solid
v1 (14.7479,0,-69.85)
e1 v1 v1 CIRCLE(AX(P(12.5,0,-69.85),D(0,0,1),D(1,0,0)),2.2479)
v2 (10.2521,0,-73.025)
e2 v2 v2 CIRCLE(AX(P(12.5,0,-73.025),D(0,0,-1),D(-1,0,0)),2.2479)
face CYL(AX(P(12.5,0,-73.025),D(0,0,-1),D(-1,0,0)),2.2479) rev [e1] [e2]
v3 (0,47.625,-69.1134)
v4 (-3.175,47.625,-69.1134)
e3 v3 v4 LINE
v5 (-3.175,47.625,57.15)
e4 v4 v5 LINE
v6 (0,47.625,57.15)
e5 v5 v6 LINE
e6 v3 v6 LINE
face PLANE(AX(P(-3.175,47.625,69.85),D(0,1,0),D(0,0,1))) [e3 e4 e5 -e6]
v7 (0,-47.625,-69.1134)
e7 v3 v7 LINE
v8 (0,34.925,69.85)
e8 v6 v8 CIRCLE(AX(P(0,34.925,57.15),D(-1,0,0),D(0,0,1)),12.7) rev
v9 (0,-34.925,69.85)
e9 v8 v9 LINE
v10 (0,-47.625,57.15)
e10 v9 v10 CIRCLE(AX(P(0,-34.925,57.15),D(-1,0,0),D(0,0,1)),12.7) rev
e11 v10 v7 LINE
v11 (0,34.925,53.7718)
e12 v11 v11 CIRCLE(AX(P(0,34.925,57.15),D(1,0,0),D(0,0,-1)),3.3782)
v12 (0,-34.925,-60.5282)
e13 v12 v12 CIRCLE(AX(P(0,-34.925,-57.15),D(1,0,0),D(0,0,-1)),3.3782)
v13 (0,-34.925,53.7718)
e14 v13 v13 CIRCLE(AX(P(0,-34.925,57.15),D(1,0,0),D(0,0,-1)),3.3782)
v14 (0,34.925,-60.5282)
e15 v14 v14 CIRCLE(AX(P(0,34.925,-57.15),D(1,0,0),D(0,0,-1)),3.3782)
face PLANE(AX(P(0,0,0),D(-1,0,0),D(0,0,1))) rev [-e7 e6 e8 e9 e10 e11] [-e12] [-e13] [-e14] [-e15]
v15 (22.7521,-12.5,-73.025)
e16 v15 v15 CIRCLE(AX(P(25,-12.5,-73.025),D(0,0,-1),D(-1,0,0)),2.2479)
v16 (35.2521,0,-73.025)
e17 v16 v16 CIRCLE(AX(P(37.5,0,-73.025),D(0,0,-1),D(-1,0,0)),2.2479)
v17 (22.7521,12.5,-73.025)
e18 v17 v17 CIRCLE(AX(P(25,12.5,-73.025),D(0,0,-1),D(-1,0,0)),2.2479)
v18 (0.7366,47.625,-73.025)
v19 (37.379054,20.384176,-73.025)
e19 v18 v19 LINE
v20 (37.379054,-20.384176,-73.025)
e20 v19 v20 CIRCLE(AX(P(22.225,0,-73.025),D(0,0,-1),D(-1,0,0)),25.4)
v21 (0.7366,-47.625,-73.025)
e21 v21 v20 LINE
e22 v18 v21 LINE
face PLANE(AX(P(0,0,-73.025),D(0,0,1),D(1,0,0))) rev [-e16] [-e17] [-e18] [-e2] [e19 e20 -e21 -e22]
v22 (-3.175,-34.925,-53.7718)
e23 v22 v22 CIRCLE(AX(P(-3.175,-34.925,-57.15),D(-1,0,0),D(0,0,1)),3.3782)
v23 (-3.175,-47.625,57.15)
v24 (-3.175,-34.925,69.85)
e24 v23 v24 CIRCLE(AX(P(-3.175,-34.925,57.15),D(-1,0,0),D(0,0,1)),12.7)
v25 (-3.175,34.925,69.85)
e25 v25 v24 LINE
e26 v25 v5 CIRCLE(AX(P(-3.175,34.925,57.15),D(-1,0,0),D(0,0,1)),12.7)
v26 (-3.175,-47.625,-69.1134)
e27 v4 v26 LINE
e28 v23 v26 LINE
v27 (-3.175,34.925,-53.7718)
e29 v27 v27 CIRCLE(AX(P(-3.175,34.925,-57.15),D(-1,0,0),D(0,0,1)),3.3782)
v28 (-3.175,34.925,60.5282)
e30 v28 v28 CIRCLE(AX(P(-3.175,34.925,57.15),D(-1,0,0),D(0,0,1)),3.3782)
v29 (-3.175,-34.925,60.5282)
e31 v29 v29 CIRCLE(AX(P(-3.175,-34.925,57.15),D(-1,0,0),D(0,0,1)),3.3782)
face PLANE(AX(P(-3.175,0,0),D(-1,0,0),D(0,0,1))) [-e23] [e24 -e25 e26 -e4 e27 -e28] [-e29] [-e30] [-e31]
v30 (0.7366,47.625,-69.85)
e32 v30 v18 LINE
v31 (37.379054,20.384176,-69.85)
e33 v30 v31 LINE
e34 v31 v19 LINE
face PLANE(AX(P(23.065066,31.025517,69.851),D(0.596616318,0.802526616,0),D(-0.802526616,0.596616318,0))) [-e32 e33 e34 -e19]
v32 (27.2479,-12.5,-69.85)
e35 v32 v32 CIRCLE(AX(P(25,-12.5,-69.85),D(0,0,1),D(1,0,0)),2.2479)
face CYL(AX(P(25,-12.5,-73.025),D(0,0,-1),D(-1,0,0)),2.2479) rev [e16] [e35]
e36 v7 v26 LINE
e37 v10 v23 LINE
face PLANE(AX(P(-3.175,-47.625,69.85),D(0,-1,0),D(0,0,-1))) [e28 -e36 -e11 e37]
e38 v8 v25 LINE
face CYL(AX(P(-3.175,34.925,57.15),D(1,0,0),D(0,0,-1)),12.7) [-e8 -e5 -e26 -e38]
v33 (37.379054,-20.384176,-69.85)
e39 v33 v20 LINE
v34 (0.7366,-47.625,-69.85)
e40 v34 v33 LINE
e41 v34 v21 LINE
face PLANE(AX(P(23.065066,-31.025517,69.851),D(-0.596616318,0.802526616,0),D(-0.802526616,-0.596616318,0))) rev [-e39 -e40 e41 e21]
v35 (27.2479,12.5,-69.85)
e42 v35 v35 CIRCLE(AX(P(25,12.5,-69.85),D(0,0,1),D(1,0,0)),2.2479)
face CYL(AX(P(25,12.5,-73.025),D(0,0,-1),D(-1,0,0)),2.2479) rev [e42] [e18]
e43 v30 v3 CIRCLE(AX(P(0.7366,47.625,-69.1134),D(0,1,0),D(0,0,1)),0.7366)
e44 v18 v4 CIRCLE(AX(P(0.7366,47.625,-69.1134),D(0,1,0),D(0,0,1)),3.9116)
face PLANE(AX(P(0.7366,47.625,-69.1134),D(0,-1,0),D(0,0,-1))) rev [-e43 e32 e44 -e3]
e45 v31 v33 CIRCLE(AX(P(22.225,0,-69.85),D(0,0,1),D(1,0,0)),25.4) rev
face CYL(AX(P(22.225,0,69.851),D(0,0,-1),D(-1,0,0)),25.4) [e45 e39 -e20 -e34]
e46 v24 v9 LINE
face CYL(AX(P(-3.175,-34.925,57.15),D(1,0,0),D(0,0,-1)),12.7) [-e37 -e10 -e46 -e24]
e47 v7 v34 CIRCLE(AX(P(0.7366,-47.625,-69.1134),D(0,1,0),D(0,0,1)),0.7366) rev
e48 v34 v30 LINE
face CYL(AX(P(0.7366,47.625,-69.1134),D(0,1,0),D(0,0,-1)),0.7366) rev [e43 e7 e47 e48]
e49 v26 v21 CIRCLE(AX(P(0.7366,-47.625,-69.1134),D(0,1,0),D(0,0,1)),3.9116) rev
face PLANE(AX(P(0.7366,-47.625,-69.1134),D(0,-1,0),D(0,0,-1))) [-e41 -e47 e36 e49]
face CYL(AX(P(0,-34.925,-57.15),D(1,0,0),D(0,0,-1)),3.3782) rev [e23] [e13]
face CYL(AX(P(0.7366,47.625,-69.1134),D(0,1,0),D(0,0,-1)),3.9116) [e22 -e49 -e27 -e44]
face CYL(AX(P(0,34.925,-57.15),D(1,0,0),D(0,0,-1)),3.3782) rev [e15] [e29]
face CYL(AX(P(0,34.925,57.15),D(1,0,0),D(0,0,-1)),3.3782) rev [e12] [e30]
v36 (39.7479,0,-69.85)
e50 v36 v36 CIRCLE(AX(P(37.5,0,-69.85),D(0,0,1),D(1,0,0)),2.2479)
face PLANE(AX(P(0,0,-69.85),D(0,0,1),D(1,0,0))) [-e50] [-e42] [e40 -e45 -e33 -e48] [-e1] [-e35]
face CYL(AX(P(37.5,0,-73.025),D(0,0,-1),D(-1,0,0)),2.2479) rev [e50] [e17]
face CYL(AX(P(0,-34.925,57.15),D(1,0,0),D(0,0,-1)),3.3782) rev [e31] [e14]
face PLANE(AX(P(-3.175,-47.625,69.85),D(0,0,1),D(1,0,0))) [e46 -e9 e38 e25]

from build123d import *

# Parameters (mm, degrees)
SKETCH3_W                    = 139.7
SKETCH3_H                    = 95.25
BASE_FLANGE1_DEPTH           = 3.175
EDGE_FLANGE1_STRIP_W         = 14.1732
EDGE_FLANGE1_STRIP_H         = 3.175
EDGE_FLANGE1_STRIP_CUT_DEPTH = 95.25
EDGE_FLANGE1_DEPTH           = 95.25
CUT_EXTRUDE2_START           = -3.175
CUT_EXTRUDE2_DEPTH           = 3.175
F_8_CLEARANCE_HOLE1_D        = 4.4958
F_1_4_CLEARANCE_HOLE1_D      = 6.7564
FILLET1_R                    = 12.7


# Read off the part's stored shape, not the designer's step: Cut-Extrude2
# Sheet-metal steps are written as plain solids
with BuildPart() as part:
    # Sketch3 → Base-Flange1 (new body)
    with BuildSketch(Plane(origin=(0, 0, 0), x_dir=(0, 0, -1), z_dir=(1, 0, 0))):
        Rectangle(SKETCH3_W, SKETCH3_H)
    extrude(amount=-BASE_FLANGE1_DEPTH)

    # Edge-Flange1 strip (across the edge) → Edge-Flange1 strip cut (cut)
    with BuildSketch(Plane(origin=(0, -47.625, -69.85), x_dir=(0, 0, 1), z_dir=(0, 1, 0))):
        with Locations((-6.35, -1.5875)):
            Rectangle(EDGE_FLANGE1_STRIP_W, EDGE_FLANGE1_STRIP_H)
    extrude(amount=EDGE_FLANGE1_STRIP_CUT_DEPTH, mode=Mode.SUBTRACT)

    # Edge-Flange1 section (across the edge) → Edge-Flange1 (add)
    with BuildSketch(Plane(origin=(0, -47.625, -69.85), x_dir=(0, 0, 1), z_dir=(0, 1, 0))):
        with BuildLine():
            Line((-3.175, 0.7366), (-3.175, 47.625))
            Line((-3.175, 47.625), (0, 47.625))
            Line((0, 47.625), (0, 0.7366))
            ThreePointArc((0, 0.7366), (0.215745145, 0.215745145), (0.7366, 0))
            Line((0.7366, 0), (0.7366, -3.175))
            ThreePointArc((0.7366, -3.175), (-2.029318885, -2.029318885), (-3.175, 0.7366))
        make_face()
    extrude(amount=EDGE_FLANGE1_DEPTH)

    # Cut-Extrude2 outline → Cut-Extrude2 (cut)
    with BuildSketch(Plane(origin=(0, 0, -73.025), x_dir=(-1, 0, 0), z_dir=(0, 0, -1)).offset(CUT_EXTRUDE2_START)):
        with BuildLine():
            ThreePointArc((-37.379054473, -20.384176045), (-44.919415432, -11.407169158), (-47.625, 0))
            Line((-47.625, 0), (-47.625, -47.625))
            Line((-47.625, -47.625), (-0.7366, -47.625))
            Line((-0.7366, -47.625), (-37.379054473, -20.384176045))
        make_face()
        with BuildLine():
            ThreePointArc((-47.625, 0), (-44.919415432, 11.407169158), (-37.379054473, 20.384176045))
            Line((-37.379054473, 20.384176045), (-0.7366, 47.625))
            Line((-0.7366, 47.625), (-47.625, 47.625))
            Line((-47.625, 47.625), (-47.625, 0))
        make_face()
    extrude(amount=CUT_EXTRUDE2_DEPTH, mode=Mode.SUBTRACT)

    # #8 Clearance Hole1 (through all)
    with Locations(Plane(origin=(0, 0, -73.025), x_dir=(-1, 0, 0), z_dir=(0, 0, -1))):
        with Locations((-25, -12.5), (-37.5, 0), (-25, 12.5), (-12.5, 0)):
            Hole(F_8_CLEARANCE_HOLE1_D / 2)

    # 1/4 Clearance Hole1 (through all)
    with Locations(Plane(origin=(0, 0, 0), x_dir=(0, 0, -1), z_dir=(1, 0, 0))):
        with Locations((-57.15, 34.925), (57.15, 34.925), (57.15, -34.925), (-57.15, -34.925)):
            Hole(F_1_4_CLEARANCE_HOLE1_D / 2)

    # Fillet1
    fillet1_edges = [part.edges().sort_by_distance(p)[0] for p in [
        (-1.5875, -47.625, 69.85),
        (-1.5875, 47.625, 69.85),
    ]]
    fillet(fillet1_edges, radius=FILLET1_R)


solid = part.part
